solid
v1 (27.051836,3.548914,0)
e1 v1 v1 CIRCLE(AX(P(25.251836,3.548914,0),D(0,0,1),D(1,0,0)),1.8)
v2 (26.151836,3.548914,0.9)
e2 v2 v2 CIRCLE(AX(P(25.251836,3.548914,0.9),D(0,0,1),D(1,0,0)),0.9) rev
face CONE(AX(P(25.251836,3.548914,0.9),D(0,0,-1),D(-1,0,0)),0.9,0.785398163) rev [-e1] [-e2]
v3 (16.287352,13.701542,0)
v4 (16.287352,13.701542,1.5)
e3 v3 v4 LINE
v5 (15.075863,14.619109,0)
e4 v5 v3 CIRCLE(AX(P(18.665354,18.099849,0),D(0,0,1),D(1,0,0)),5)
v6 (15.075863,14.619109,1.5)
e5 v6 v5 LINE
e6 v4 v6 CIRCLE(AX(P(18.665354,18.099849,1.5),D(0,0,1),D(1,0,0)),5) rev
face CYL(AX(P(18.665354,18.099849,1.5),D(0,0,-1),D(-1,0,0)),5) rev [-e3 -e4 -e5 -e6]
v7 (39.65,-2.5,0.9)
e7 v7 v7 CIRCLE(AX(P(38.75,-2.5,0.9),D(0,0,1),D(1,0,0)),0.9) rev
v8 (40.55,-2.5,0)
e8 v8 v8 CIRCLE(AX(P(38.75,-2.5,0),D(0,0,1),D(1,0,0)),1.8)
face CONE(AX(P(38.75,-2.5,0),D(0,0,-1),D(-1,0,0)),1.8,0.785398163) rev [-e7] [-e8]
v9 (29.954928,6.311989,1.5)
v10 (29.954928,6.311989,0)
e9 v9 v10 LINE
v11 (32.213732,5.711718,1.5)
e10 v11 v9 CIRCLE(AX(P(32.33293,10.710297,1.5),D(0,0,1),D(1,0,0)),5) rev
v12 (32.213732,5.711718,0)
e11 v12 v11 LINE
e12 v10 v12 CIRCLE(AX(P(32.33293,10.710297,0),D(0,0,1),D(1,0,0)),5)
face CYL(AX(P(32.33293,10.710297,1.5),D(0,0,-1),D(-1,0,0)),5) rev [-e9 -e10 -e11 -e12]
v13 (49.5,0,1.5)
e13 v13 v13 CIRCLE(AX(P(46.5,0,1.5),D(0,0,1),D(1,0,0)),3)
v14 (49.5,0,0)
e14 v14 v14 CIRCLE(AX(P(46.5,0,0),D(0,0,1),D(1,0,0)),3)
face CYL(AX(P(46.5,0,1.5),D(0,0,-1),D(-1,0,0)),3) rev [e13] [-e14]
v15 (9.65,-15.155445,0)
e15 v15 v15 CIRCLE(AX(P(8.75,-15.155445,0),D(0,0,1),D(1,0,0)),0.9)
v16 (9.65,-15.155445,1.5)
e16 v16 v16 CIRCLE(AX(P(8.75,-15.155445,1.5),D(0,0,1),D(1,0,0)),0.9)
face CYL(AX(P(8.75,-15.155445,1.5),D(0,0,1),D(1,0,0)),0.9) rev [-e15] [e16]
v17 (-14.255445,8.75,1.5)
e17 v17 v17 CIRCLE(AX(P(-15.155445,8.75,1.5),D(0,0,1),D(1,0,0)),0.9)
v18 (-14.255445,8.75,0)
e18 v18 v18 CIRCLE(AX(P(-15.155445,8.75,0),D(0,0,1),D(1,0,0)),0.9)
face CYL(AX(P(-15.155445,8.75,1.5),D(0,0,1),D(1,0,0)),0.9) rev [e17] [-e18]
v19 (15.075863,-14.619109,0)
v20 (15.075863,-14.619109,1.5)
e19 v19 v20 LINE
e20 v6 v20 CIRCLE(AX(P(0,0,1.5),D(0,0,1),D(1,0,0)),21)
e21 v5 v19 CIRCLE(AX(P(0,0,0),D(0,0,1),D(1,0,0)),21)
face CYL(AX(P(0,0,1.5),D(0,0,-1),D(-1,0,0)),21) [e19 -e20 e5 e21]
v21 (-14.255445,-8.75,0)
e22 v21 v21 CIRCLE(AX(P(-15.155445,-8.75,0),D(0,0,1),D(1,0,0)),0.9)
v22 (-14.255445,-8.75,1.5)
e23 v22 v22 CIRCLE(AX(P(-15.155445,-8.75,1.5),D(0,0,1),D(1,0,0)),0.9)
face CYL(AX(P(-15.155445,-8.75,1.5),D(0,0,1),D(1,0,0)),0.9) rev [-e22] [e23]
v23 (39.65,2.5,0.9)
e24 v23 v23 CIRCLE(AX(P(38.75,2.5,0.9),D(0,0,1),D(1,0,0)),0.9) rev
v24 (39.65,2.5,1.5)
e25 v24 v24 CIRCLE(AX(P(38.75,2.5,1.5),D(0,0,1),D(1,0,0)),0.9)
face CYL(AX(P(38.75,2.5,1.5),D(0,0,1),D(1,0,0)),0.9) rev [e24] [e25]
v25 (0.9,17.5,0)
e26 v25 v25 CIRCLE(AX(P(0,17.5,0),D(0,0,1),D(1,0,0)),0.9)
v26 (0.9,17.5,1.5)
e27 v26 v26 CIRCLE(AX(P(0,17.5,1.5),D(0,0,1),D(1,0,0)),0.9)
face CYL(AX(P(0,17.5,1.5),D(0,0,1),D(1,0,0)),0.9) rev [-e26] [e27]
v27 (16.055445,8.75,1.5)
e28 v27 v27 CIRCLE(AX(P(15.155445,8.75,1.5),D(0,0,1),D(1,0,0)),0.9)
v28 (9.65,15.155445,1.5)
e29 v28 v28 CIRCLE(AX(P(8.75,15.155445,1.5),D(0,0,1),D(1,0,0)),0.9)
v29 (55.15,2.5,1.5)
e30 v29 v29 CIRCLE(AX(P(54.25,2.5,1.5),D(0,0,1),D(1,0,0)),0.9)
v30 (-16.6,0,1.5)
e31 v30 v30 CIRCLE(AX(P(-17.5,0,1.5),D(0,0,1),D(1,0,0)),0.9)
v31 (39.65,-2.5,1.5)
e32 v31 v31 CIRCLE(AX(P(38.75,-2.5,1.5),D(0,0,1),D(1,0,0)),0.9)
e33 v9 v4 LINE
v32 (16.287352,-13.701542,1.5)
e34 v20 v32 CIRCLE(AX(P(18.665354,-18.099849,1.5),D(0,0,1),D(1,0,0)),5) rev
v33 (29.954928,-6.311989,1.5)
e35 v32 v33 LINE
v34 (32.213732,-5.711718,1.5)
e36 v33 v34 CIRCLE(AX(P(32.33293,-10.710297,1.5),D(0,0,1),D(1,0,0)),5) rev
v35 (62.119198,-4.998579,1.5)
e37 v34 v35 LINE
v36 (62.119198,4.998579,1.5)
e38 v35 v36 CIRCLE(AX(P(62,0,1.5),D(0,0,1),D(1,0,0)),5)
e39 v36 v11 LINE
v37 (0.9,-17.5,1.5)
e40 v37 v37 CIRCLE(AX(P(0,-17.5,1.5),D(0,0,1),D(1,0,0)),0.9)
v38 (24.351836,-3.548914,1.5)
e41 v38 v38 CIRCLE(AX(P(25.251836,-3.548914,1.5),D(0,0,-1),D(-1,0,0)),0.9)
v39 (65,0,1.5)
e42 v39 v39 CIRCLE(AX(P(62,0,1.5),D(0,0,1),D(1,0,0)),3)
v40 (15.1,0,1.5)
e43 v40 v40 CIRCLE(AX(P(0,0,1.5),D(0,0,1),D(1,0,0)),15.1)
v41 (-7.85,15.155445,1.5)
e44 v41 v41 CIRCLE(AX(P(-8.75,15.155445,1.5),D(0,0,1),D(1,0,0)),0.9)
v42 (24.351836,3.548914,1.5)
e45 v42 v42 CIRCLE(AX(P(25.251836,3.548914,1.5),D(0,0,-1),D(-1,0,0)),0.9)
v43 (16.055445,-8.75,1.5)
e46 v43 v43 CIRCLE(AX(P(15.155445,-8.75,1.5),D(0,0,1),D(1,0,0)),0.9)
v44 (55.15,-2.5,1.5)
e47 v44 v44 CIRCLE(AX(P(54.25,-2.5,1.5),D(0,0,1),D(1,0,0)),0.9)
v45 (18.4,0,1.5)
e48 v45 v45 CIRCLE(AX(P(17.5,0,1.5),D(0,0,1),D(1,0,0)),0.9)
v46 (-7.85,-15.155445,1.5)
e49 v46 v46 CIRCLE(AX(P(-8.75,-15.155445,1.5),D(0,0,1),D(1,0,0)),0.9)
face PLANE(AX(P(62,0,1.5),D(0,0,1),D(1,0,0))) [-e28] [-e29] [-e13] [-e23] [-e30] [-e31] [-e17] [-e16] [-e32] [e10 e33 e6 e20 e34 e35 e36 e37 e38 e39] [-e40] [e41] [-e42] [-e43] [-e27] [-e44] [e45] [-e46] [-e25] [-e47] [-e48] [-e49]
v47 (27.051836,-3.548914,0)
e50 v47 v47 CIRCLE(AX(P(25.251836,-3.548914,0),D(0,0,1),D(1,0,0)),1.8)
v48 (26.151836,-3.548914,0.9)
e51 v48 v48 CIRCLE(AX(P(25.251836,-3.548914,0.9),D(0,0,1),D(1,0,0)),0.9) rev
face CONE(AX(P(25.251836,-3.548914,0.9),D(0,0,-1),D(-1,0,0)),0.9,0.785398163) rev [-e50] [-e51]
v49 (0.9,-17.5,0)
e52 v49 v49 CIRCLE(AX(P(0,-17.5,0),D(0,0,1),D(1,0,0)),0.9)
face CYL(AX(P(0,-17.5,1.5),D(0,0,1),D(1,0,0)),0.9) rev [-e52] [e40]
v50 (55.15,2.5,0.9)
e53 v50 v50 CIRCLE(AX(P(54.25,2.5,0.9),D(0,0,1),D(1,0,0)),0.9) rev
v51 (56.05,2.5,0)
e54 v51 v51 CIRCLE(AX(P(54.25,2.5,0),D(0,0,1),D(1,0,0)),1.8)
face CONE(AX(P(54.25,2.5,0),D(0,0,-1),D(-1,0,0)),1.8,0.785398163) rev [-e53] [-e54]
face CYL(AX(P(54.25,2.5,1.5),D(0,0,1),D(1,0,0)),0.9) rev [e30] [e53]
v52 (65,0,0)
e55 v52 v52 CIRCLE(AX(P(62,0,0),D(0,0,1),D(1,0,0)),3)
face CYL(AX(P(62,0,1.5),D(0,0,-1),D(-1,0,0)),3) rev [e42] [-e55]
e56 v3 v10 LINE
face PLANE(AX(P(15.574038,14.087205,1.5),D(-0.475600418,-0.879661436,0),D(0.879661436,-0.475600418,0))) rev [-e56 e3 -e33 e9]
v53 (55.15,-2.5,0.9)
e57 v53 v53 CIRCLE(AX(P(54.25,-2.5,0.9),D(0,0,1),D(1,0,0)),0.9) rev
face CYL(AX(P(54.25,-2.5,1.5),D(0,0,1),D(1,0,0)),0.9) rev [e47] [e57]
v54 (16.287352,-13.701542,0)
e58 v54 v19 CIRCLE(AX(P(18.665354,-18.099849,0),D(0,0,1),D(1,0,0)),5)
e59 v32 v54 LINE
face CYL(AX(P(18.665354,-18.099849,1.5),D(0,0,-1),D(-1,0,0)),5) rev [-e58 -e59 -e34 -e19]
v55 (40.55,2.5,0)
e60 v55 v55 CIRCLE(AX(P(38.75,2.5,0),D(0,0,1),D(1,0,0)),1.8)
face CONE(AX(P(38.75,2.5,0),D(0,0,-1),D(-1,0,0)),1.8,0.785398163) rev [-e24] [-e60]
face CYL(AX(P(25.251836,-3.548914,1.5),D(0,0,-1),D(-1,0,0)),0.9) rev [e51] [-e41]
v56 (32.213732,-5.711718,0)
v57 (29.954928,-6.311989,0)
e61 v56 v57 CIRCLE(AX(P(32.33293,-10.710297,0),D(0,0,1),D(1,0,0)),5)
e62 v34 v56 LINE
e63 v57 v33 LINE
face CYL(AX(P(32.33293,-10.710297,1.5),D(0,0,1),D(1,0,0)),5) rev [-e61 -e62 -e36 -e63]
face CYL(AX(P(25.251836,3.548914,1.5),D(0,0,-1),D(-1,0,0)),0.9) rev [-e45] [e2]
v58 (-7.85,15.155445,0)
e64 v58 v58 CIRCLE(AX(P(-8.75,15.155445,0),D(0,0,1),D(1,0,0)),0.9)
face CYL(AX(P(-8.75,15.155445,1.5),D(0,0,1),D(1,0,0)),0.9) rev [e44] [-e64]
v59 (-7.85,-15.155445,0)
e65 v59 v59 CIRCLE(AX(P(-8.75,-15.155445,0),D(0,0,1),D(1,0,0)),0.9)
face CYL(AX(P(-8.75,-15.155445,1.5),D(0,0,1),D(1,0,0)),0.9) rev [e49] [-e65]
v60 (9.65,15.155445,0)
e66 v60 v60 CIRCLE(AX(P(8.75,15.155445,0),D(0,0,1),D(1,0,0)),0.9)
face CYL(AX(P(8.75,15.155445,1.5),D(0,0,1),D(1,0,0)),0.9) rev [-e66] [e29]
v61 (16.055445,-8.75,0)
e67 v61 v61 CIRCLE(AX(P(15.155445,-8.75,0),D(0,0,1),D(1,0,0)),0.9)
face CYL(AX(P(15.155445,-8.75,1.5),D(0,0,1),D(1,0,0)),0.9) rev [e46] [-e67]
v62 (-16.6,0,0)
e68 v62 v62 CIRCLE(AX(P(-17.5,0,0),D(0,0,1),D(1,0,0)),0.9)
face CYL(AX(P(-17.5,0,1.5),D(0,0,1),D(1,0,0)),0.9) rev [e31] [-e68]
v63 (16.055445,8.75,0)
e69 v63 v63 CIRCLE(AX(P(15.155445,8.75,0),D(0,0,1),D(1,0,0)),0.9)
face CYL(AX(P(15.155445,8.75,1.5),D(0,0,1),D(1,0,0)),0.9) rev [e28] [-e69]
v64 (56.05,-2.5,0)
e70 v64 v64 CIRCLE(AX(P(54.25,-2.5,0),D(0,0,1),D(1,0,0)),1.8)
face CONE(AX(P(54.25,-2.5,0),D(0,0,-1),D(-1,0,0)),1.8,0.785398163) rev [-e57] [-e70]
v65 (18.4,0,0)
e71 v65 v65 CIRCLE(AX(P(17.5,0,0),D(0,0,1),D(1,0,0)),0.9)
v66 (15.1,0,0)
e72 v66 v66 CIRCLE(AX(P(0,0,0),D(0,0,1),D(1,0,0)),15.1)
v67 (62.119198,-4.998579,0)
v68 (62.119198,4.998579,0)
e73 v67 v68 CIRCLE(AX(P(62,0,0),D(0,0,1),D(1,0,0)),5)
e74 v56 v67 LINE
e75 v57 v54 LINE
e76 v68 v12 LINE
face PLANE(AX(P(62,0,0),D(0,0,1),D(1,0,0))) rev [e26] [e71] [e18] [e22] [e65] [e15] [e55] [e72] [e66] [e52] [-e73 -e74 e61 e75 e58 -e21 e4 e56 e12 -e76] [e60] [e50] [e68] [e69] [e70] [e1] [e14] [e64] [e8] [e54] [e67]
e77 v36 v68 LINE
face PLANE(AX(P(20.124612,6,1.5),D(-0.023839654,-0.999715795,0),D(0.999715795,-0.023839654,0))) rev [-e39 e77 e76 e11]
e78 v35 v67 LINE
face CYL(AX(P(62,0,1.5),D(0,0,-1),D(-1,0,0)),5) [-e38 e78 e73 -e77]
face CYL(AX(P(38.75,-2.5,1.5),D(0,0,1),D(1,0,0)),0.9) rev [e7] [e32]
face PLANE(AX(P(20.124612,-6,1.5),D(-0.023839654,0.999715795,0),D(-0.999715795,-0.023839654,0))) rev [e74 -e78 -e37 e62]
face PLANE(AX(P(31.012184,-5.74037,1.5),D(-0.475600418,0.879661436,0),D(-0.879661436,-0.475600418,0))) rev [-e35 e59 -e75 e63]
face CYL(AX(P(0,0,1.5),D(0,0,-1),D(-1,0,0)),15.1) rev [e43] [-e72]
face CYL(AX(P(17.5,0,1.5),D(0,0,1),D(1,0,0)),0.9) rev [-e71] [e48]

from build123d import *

# Parameters (mm, degrees)
SKETCH1_R                  = 15.1
SKETCH1_R_2                = 3
BOSS_EXTRUDE1_DEPTH        = 1.5
M1_6_CLEARANCE_HOLE2_D     = 1.8
M1_6_CLEARANCE_HOLE2_DEPTH = 11.5
CIRPATTERN1_COUNT          = 12
M1_6_CLEARANCE_HOLE1_D     = 1.8
M1_6_CLEARANCE_HOLE1_DEPTH = 11.5
CHAMFER2_SIZE              = 10.890667049
FILLET4_R                  = 5
CHAMFER3_SIZE              = 0.9
ESQUISSE1_R                = 0.9
ENL_V_MAT_EXTRU_1_DEPTH    = 71.229979354
CHANFREIN1_SIZE            = 0.9


with BuildPart() as part:
    # Sketch1 → Boss-Extrude1 (new body)
    with BuildSketch(Plane.XY):
        with BuildLine():
            Line((20.124611797, 6), (62.119198271, 4.998578975))
            ThreePointArc((62.119198271, 4.998578975), (67, 0), (62.119198271, -4.998578975))
            Line((62.119198271, -4.998578975), (20.124611797, -6))
            ThreePointArc((20.124611797, -6), (-21, 0), (20.124611797, 6))
        make_face()
        Circle(SKETCH1_R, mode=Mode.SUBTRACT)
        with Locations((46.5, 0)):
            Circle(SKETCH1_R_2, mode=Mode.SUBTRACT)
        with Locations((62, 0)):
            Circle(SKETCH1_R_2, mode=Mode.SUBTRACT)
    extrude(amount=BOSS_EXTRUDE1_DEPTH)

    # M1.6 Clearance Hole2
    with Locations(Plane.XY.offset(1.5)):
        with Locations((0, 17.5)):
            m1_6_clearance_hole2 = Hole(M1_6_CLEARANCE_HOLE2_D / 2, depth=M1_6_CLEARANCE_HOLE2_DEPTH)

    # CirPattern1: M1.6 Clearance Hole2 ×12 about axis
    cirpattern1_axis = Axis((0, 0, 0), (0, 0, 1))
    for i in range(1, CIRPATTERN1_COUNT):
        add(m1_6_clearance_hole2.rotate(cirpattern1_axis, i * 360 / CIRPATTERN1_COUNT), mode=Mode.SUBTRACT)

    # M1.6 Clearance Hole1
    with Locations(Plane.XY.offset(1.5)):
        with Locations((38.75, 2.5), (54.25, -2.5), (38.75, -2.5), (54.25, 2.5)):
            Hole(M1_6_CLEARANCE_HOLE1_D / 2, depth=M1_6_CLEARANCE_HOLE1_DEPTH)

    # Chamfer2
    # the kernel refuses this chamfer: 10.890667049, 7 mm, written as the material it adds along each edge
    with BuildSketch(Plane(origin=(20.124611797, -6, 0), x_dir=(-0.49038575496704445, -0.8715054855394783, 0), z_dir=(0, 0, 1))) as chamfer2_piece_1:
        with BuildLine():
            Line((9.279580073, 0), (-CHAMFER2_SIZE * 0.511022774248, CHAMFER2_SIZE * 0.85956717261))
            Line((-CHAMFER2_SIZE * 0.511022774248, CHAMFER2_SIZE * 0.85956717261), (0, 0))
            ThreePointArc((0, 0), (4.8297685, 0.518116548), (9.279580073, 0))
        make_face()
    extrude(amount=1.5)
    with BuildSketch(Plane(origin=(20.124611797, 6, 0), x_dir=(0.9997157950597969, -0.023839654107353114, 0), z_dir=(0, 0, 1))) as chamfer2_piece_2:
        with BuildLine():
            Line((CHAMFER2_SIZE, 0), (-4.742076753, 7.976422406))
            ThreePointArc((-4.742076753, 7.976422406), (-2.022765722, 4.41627981), (0, 0))
            Line((0, 0), (CHAMFER2_SIZE, 0))
        make_face()
    extrude(amount=1.5)

    # Fillet4
    fillet4_edges = [part.edges().sort_by_distance(p)[0] for p in [
        (31.012183665, -5.740370265, 0.75),
        (15.574037918, 14.087204937, 0.75),
        (15.574037918, -14.087204937, 0.75),
        (31.012183665, 5.740370265, 0.75),
    ]]
    fillet(fillet4_edges, radius=FILLET4_R)

    # Chamfer3
    chamfer3_edges = [part.edges().sort_by_distance(p)[0] for p in [
        (39.65, 2.5, 0),
        (55.15, 2.5, 0),
        (39.65, -2.5, 0),
        (55.15, -2.5, 0),
    ]]
    chamfer(chamfer3_edges, length=CHAMFER3_SIZE)

    # Esquisse1 → Enlèv. mat.-Extru.1 (cut, through all)
    with BuildSketch(Plane(origin=(0, 0, 0), x_dir=(-1, 0, 0), z_dir=(0, 0, -1))):
        with Locations((-25.251835753, 3.548914074)):
            Circle(ESQUISSE1_R)
        with Locations((-25.251835753, -3.548914074)):
            Circle(ESQUISSE1_R)
    extrude(amount=-ENL_V_MAT_EXTRU_1_DEPTH, mode=Mode.SUBTRACT)

    # Chanfrein1
    chanfrein1_edges = [part.edges().sort_by_distance(p)[0] for p in [
        (26.151835753, 3.548914074, 0),
        (26.151835753, -3.548914074, 0),
    ]]
    chamfer(chanfrein1_edges, length=CHANFREIN1_SIZE)


solid = part.part
